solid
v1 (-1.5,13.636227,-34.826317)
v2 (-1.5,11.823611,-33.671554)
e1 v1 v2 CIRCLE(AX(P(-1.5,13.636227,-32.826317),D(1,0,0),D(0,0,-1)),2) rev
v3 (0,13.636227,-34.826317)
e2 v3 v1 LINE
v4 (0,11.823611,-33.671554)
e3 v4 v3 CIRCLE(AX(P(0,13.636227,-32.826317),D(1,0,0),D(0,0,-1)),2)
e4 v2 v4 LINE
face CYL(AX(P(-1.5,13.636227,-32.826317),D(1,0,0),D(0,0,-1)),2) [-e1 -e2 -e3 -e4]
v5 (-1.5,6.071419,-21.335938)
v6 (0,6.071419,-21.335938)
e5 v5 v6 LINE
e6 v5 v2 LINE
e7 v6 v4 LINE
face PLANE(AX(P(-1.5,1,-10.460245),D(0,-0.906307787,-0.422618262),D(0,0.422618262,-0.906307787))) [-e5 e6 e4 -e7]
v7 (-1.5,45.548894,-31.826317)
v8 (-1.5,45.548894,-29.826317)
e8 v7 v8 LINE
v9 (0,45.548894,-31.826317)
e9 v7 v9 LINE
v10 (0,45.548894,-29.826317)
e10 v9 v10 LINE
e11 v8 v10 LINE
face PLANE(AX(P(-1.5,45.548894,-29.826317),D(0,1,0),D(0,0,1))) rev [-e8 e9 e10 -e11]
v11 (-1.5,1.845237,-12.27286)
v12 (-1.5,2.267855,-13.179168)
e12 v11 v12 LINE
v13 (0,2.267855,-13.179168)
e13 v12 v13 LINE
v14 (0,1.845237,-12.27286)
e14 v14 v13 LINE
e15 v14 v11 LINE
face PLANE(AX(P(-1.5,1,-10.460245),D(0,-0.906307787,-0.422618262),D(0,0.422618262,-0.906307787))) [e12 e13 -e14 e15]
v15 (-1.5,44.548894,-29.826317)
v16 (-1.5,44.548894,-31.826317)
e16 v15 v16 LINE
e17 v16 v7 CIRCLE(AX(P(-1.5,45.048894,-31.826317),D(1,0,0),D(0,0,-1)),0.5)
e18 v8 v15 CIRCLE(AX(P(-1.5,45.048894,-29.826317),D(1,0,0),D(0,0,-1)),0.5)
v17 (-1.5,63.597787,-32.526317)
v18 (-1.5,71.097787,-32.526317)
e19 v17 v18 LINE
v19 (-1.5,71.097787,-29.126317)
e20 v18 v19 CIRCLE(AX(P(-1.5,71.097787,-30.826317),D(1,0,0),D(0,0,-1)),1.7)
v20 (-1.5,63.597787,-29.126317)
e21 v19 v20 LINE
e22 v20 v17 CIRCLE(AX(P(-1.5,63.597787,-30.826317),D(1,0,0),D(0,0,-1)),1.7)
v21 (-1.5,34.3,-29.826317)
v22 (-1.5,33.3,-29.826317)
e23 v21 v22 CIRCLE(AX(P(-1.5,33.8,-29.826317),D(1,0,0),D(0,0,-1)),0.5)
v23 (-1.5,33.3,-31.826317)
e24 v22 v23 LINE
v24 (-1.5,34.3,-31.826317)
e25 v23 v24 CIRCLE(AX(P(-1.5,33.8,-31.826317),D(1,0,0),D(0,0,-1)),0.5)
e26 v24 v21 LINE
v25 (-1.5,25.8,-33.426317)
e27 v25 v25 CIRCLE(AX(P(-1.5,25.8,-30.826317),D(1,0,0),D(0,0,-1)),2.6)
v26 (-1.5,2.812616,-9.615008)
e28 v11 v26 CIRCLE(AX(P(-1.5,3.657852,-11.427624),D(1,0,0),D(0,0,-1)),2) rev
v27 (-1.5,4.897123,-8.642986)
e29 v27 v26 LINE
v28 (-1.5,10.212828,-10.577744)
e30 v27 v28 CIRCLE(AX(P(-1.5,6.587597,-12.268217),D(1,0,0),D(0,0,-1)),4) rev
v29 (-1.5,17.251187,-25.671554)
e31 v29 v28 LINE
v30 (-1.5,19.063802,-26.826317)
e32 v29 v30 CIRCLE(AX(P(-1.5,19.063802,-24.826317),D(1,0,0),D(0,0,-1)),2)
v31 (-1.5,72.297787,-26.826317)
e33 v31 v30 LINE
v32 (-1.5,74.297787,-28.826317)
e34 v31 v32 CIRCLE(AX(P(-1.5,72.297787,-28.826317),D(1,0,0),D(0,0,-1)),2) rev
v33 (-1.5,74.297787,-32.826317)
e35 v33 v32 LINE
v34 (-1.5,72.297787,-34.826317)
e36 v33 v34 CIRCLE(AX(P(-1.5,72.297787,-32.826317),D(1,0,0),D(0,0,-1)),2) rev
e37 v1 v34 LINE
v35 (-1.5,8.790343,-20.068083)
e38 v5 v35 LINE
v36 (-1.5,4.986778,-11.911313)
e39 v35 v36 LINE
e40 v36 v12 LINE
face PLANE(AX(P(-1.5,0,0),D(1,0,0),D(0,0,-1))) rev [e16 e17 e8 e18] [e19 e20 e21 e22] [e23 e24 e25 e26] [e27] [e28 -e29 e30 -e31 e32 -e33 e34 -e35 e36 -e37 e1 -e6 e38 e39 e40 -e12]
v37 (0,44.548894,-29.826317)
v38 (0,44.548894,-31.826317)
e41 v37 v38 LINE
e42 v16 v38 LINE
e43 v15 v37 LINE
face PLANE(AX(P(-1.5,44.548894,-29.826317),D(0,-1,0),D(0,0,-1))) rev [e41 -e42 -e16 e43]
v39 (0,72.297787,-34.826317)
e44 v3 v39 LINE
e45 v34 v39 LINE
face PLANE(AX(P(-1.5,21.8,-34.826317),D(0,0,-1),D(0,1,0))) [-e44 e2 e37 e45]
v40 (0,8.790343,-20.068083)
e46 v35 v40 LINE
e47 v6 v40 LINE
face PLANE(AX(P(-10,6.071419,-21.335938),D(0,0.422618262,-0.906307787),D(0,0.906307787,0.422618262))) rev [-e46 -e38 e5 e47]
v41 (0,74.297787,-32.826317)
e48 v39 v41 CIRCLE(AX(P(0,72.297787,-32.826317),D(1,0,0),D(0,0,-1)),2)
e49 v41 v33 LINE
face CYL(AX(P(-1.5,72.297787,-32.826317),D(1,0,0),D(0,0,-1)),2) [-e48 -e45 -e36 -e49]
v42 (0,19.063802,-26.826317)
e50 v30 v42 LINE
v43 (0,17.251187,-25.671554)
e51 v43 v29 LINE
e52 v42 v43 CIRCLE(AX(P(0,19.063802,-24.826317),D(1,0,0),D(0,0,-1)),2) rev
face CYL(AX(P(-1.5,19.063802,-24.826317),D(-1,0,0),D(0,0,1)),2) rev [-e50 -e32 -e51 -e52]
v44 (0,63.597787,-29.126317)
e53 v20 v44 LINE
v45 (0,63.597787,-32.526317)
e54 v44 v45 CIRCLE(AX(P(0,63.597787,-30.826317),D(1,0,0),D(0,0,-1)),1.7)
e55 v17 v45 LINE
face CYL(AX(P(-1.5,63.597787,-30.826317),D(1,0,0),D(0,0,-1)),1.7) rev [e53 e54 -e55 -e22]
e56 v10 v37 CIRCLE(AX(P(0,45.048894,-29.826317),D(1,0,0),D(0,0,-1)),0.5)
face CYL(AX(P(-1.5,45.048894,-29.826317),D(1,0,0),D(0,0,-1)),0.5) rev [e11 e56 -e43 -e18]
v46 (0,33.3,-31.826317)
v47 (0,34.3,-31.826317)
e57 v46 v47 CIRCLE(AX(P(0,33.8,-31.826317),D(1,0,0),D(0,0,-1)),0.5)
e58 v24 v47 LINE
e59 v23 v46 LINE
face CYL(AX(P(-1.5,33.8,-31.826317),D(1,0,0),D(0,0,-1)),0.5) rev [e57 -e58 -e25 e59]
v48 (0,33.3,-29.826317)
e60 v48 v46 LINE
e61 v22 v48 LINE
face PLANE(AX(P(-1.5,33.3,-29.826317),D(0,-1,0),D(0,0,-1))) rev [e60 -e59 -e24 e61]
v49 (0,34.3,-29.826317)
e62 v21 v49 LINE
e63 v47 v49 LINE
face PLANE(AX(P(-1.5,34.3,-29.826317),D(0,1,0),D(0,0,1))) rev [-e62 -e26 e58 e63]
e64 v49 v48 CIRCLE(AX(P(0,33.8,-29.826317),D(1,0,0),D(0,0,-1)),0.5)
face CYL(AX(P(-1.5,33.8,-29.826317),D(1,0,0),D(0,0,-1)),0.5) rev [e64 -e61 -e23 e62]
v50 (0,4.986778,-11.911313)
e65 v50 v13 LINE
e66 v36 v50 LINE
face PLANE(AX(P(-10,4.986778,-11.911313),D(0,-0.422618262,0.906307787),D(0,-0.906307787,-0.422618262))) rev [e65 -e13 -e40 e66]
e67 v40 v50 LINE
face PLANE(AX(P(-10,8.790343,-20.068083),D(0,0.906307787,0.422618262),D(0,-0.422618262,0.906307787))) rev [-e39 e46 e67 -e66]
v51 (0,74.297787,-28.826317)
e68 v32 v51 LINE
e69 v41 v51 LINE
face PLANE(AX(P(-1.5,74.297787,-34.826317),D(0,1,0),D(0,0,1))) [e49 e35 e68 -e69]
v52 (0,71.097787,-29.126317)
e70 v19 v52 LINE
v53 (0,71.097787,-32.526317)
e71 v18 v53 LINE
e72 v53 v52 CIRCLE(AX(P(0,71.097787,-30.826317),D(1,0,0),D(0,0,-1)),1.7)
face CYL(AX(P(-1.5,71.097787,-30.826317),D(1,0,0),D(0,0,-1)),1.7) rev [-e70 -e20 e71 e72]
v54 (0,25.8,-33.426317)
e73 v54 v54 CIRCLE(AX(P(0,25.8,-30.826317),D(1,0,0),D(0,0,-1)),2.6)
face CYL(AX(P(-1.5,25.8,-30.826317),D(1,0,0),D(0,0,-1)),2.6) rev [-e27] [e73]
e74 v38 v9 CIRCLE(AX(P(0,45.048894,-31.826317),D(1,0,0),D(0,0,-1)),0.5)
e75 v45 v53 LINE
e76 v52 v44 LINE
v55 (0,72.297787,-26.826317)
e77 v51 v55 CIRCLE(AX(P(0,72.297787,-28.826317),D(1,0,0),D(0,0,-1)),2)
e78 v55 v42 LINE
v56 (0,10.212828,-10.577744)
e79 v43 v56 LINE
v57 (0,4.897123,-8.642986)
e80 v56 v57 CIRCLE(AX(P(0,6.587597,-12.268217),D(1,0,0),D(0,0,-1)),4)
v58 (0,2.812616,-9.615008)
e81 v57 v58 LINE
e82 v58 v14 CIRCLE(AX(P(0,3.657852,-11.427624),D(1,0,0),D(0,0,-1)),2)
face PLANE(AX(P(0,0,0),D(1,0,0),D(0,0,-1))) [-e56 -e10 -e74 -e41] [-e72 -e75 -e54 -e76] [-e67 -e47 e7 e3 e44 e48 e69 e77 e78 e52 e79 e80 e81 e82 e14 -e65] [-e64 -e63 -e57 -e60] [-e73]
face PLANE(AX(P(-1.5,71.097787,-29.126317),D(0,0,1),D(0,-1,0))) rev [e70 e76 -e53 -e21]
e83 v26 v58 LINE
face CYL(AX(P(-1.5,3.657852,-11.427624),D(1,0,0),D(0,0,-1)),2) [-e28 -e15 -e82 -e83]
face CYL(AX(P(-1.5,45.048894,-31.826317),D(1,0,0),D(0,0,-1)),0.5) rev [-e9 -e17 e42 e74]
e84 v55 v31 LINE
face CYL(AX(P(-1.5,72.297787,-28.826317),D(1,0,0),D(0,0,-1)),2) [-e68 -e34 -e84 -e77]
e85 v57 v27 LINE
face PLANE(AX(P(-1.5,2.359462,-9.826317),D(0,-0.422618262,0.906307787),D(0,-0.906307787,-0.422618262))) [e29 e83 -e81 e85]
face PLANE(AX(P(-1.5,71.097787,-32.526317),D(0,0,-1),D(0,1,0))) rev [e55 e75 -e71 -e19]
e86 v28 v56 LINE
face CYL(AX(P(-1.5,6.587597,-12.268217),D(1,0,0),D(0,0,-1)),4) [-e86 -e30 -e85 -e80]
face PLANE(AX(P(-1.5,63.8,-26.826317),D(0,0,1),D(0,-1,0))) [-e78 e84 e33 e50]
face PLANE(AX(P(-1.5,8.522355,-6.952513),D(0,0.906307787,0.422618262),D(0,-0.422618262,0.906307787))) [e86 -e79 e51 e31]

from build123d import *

# Parameters (mm, degrees)
SKETCH1_R            = 2.6
BASE_FLANGE1_DEPTH   = 1.5
KEYING_DEPTH         = 10
FILLET1_R            = 2
FILLET2_R            = 4
JOG1_START           = -34.826317149
JOG1_DEPTH           = 8
JOG1_START_2         = -32.826317149
JOG1_2_DEPTH         = 0.3
JOG1_START_3         = -29.126317149
JOG1_3_DEPTH         = 0.3
JOG1_4_DEPTH         = 8
JOG1_START_4         = -13.5
JOG1_5_DEPTH         = 1.5
CUT_EXTRUDE1_START   = -13.5
CUT_EXTRUDE1_DEPTH   = 12
CUT_EXTRUDE1_START_2 = -1.5
CUT_EXTRUDE1_2_DEPTH = 1.5
CUT_EXTRUDE1_3_DEPTH = 1.5


with BuildPart() as part:
    # Base-Flange1: sheet metal written as solids
    # Sketch1 → Base-Flange1 (new body)
    with BuildSketch(Plane(origin=(0, 0, 0), x_dir=(0, 0, -1), z_dir=(1, 0, 0))):
        Polygon((34.826317149, 21.8), (34.826317149, 63.8), (26.826317149, 63.8), (26.826317149, 17.789661718), (6.95251297, 8.522354632), (9.826317149, 2.359461681), (10.460244542, 1), (34.826317149, 12.362086256), align=None)
        with Locations((30.826317149, 25.8)):
            Circle(SKETCH1_R, mode=Mode.SUBTRACT)
        with BuildLine():
            Line((32.526317149, 60.6), (32.526317149, 53.1))
            ThreePointArc((32.526317149, 53.1), (30.826317149, 51.4), (29.126317149, 53.1))
            Line((29.126317149, 53.1), (29.126317149, 60.6))
            ThreePointArc((29.126317149, 60.6), (30.826317149, 62.3), (32.526317149, 60.6))
        make_face(mode=Mode.SUBTRACT)
    extrude(amount=-BASE_FLANGE1_DEPTH)

    # Sketch6 → Keying (cut)
    with BuildSketch(Plane(origin=(0, 0, 0), x_dir=(0, 0, -1), z_dir=(1, 0, 0))):
        Polygon((21.335937987, 6.071419141), (20.068083201, 8.790342502), (11.911313118, 4.986778146), (13.179167903, 2.267854785), (16.260435533, 3.704673478), align=None)
    extrude(amount=-KEYING_DEPTH, mode=Mode.SUBTRACT)

    # Fillet1
    fillet1_edges = [part.edges().sort_by_distance(p)[0] for p in [
        (-0.75, 12.362086256, -34.826317149),
        (-0.75, 1, -10.460244542),
        (-0.75, 17.789661718, -26.826317149),
        (-0.75, 63.8, -26.826317149),
        (-0.75, 63.8, -34.826317149),
    ]]
    fillet(fillet1_edges, radius=FILLET1_R)

    # Fillet2
    fillet2_edges = [part.edges().sort_by_distance(p)[0] for p in [
        (-0.75, 8.522354632, -6.95251297),
    ]]
    fillet(fillet2_edges, radius=FILLET2_R)

    # Jog1: read off the stored shape, not the designer's step
    # Jog1 outline → Jog1 (cut)
    with BuildSketch(Plane.XY.offset(JOG1_START)):
        with BuildLine():
            Line((-1.5, 63.8), (-1.5, 34.716841062))
            ThreePointArc((-1.5, 34.716841062), (-0.408349934, 33.794859608), (0, 32.425553214))
            Line((0, 32.425553214), (0, 63.8))
            Line((0, 63.8), (-1.5, 63.8))
        make_face()
    extrude(amount=JOG1_DEPTH, mode=Mode.SUBTRACT)

    # Jog1 2 outline → Jog1 2 (add)
    with BuildSketch(Plane.XY.offset(JOG1_START_2)):
        with BuildLine():
            ThreePointArc((-1.5, 34.716841062), (-1.989225891, 34.872818996), (-2.5, 34.925553214))
            Line((-2.5, 34.925553214), (-11, 34.925553214))
            ThreePointArc((-11, 34.925553214), (-11.707106781, 35.218446433), (-12, 35.925553214))
            Line((-12, 35.925553214), (-12, 63.8))
            Line((-12, 63.8), (-13.5, 63.8))
            Line((-13.5, 63.8), (-13.5, 35.925553214))
            ThreePointArc((-13.5, 35.925553214), (-12.767766953, 34.157786261), (-11, 33.425553214))
            Line((-11, 33.425553214), (-2.5, 33.425553214))
            ThreePointArc((-2.5, 33.425553214), (-1.792893219, 33.132659995), (-1.5, 32.425553214))
            Line((-1.5, 32.425553214), (-1.5, 34.716841062))
        make_face()
    extrude(amount=JOG1_2_DEPTH)

    # Jog1 3 outline → Jog1 3 (add)
    with BuildSketch(Plane.XY.offset(JOG1_START_3)):
        with BuildLine():
            ThreePointArc((-1.5, 34.716841062), (-1.989225891, 34.872818996), (-2.5, 34.925553214))
            Line((-2.5, 34.925553214), (-11, 34.925553214))
            ThreePointArc((-11, 34.925553214), (-11.707106781, 35.218446433), (-12, 35.925553214))
            Line((-12, 35.925553214), (-12, 63.8))
            Line((-12, 63.8), (-13.5, 63.8))
            Line((-13.5, 63.8), (-13.5, 35.925553214))
            ThreePointArc((-13.5, 35.925553214), (-12.767766953, 34.157786261), (-11, 33.425553214))
            Line((-11, 33.425553214), (-2.5, 33.425553214))
            ThreePointArc((-2.5, 33.425553214), (-1.792893219, 33.132659995), (-1.5, 32.425553214))
            Line((-1.5, 32.425553214), (-1.5, 34.716841062))
        make_face()
    extrude(amount=JOG1_3_DEPTH)

    # Jog1 4 outline → Jog1 4 (add)
    with BuildSketch(Plane.XY.offset(JOG1_START)):
        with BuildLine():
            ThreePointArc((-1.5, 34.716841062), (-1.989225891, 34.872818996), (-2.5, 34.925553214))
            Line((-2.5, 34.925553214), (-11, 34.925553214))
            ThreePointArc((-11, 34.925553214), (-11.707106781, 35.218446433), (-12, 35.925553214))
            Line((-12, 35.925553214), (-12, 63.8))
            Line((-12, 63.8), (-13.5, 63.8))
            Line((-13.5, 63.8), (-13.5, 35.925553214))
            ThreePointArc((-13.5, 35.925553214), (-12.767766953, 34.157786261), (-11, 33.425553214))
            Line((-11, 33.425553214), (-2.5, 33.425553214))
            ThreePointArc((-2.5, 33.425553214), (-1.792893219, 33.132659995), (-1.5, 32.425553214))
            Line((-1.5, 32.425553214), (-1.5, 34.716841062))
        make_face()
    extrude(amount=JOG1_4_DEPTH)

    # Jog1 5 outline → Jog1 5 (cut)
    with BuildSketch(Plane.YZ.offset(JOG1_START_4)):
        with BuildLine():
            ThreePointArc((61.8, -26.826317149), (63.214213562, -27.412103587), (63.8, -28.826317149))
            Line((63.8, -28.826317149), (63.8, -26.826317149))
            Line((63.8, -26.826317149), (61.8, -26.826317149))
        make_face()
        with BuildLine():
            ThreePointArc((63.8, -32.826317149), (63.214213562, -34.240530711), (61.8, -34.826317149))
            Line((61.8, -34.826317149), (63.8, -34.826317149))
            Line((63.8, -34.826317149), (63.8, -32.826317149))
        make_face()
        with BuildLine():
            Line((60.6, -29.126317149), (53.1, -29.126317149))
            ThreePointArc((53.1, -29.126317149), (51.4, -30.826317149), (53.1, -32.526317149))
            Line((53.1, -32.526317149), (60.6, -32.526317149))
            ThreePointArc((60.6, -32.526317149), (62.3, -30.826317149), (60.6, -29.126317149))
        make_face()
    extrude(amount=JOG1_5_DEPTH, mode=Mode.SUBTRACT)

    # Cut-Extrude1: read off the stored shape, not the designer's step
    # Cut-Extrude1 outline → Cut-Extrude1 (cut)
    with BuildSketch(Plane(origin=(0, 0, 0), x_dir=(0, 0, -1), z_dir=(1, 0, 0)).offset(CUT_EXTRUDE1_START)):
        with BuildLine():
            Line((26.826317149, 31), (34.826317149, 31))
            Line((34.826317149, 31), (34.826317149, 61.8))
            ThreePointArc((34.826317149, 61.8), (34.240530711, 63.214213562), (32.826317149, 63.8))
            Line((32.826317149, 63.8), (28.826317149, 63.8))
            ThreePointArc((28.826317149, 63.8), (27.412103587, 63.214213562), (26.826317149, 61.8))
            Line((26.826317149, 61.8), (26.826317149, 31))
        make_face()
        with BuildLine():
            ThreePointArc((29.126317149, 60.6), (30.826317149, 62.3), (32.526317149, 60.6))
            Line((32.526317149, 60.6), (32.526317149, 53.1))
            ThreePointArc((32.526317149, 53.1), (30.826317149, 51.4), (29.126317149, 53.1))
            Line((29.126317149, 53.1), (29.126317149, 60.6))
        make_face(mode=Mode.SUBTRACT)
    extrude(amount=CUT_EXTRUDE1_DEPTH, mode=Mode.SUBTRACT)

    # Cut-Extrude1 2 outline → Cut-Extrude1 2 (cut)
    with BuildSketch(Plane(origin=(0, 0, 0), x_dir=(0, 0, -1), z_dir=(1, 0, 0)).offset(CUT_EXTRUDE1_START_2)):
        with BuildLine():
            ThreePointArc((29.826317149, 34.3), (29.326317149, 33.8), (29.826317149, 33.3))
            Line((29.826317149, 33.3), (31.826317149, 33.3))
            ThreePointArc((31.826317149, 33.3), (32.326317149, 33.8), (31.826317149, 34.3))
            Line((31.826317149, 34.3), (29.826317149, 34.3))
        make_face()
    extrude(amount=CUT_EXTRUDE1_2_DEPTH, mode=Mode.SUBTRACT)

    # Cut-Extrude1 3 outline → Cut-Extrude1 3 (add)
    with BuildSketch(Plane(origin=(0, 0, 0), x_dir=(0, 0, -1), z_dir=(1, 0, 0)).offset(CUT_EXTRUDE1_START_2)):
        with BuildLine():
            Line((26.826317149, 31), (34.826317149, 31))
            Line((34.826317149, 31), (34.826317149, 72.297787144))
            ThreePointArc((34.826317149, 72.297787144), (34.240530711, 73.712000706), (32.826317149, 74.297787144))
            Line((32.826317149, 74.297787144), (28.826317149, 74.297787144))
            ThreePointArc((28.826317149, 74.297787144), (27.412103587, 73.712000706), (26.826317149, 72.297787144))
            Line((26.826317149, 72.297787144), (26.826317149, 31))
        make_face()
        with BuildLine():
            ThreePointArc((29.826317149, 33.3), (29.326317149, 33.8), (29.826317149, 34.3))
            Line((29.826317149, 34.3), (31.826317149, 34.3))
            ThreePointArc((31.826317149, 34.3), (32.326317149, 33.8), (31.826317149, 33.3))
            Line((31.826317149, 33.3), (29.826317149, 33.3))
        make_face(mode=Mode.SUBTRACT)
        with BuildLine():
            Line((29.826317149, 45.548893572), (31.826317149, 45.548893572))
            ThreePointArc((31.826317149, 45.548893572), (32.326317149, 45.048893572), (31.826317149, 44.548893572))
            Line((31.826317149, 44.548893572), (29.826317149, 44.548893572))
            ThreePointArc((29.826317149, 44.548893572), (29.326317149, 45.048893572), (29.826317149, 45.548893572))
        make_face(mode=Mode.SUBTRACT)
        with BuildLine():
            Line((29.126317149, 63.597787144), (29.126317149, 71.097787144))
            ThreePointArc((29.126317149, 71.097787144), (30.826317149, 72.797787144), (32.526317149, 71.097787144))
            Line((32.526317149, 71.097787144), (32.526317149, 63.597787144))
            ThreePointArc((32.526317149, 63.597787144), (30.826317149, 61.897787144), (29.126317149, 63.597787144))
        make_face(mode=Mode.SUBTRACT)
    extrude(amount=CUT_EXTRUDE1_3_DEPTH)


solid = part.part
